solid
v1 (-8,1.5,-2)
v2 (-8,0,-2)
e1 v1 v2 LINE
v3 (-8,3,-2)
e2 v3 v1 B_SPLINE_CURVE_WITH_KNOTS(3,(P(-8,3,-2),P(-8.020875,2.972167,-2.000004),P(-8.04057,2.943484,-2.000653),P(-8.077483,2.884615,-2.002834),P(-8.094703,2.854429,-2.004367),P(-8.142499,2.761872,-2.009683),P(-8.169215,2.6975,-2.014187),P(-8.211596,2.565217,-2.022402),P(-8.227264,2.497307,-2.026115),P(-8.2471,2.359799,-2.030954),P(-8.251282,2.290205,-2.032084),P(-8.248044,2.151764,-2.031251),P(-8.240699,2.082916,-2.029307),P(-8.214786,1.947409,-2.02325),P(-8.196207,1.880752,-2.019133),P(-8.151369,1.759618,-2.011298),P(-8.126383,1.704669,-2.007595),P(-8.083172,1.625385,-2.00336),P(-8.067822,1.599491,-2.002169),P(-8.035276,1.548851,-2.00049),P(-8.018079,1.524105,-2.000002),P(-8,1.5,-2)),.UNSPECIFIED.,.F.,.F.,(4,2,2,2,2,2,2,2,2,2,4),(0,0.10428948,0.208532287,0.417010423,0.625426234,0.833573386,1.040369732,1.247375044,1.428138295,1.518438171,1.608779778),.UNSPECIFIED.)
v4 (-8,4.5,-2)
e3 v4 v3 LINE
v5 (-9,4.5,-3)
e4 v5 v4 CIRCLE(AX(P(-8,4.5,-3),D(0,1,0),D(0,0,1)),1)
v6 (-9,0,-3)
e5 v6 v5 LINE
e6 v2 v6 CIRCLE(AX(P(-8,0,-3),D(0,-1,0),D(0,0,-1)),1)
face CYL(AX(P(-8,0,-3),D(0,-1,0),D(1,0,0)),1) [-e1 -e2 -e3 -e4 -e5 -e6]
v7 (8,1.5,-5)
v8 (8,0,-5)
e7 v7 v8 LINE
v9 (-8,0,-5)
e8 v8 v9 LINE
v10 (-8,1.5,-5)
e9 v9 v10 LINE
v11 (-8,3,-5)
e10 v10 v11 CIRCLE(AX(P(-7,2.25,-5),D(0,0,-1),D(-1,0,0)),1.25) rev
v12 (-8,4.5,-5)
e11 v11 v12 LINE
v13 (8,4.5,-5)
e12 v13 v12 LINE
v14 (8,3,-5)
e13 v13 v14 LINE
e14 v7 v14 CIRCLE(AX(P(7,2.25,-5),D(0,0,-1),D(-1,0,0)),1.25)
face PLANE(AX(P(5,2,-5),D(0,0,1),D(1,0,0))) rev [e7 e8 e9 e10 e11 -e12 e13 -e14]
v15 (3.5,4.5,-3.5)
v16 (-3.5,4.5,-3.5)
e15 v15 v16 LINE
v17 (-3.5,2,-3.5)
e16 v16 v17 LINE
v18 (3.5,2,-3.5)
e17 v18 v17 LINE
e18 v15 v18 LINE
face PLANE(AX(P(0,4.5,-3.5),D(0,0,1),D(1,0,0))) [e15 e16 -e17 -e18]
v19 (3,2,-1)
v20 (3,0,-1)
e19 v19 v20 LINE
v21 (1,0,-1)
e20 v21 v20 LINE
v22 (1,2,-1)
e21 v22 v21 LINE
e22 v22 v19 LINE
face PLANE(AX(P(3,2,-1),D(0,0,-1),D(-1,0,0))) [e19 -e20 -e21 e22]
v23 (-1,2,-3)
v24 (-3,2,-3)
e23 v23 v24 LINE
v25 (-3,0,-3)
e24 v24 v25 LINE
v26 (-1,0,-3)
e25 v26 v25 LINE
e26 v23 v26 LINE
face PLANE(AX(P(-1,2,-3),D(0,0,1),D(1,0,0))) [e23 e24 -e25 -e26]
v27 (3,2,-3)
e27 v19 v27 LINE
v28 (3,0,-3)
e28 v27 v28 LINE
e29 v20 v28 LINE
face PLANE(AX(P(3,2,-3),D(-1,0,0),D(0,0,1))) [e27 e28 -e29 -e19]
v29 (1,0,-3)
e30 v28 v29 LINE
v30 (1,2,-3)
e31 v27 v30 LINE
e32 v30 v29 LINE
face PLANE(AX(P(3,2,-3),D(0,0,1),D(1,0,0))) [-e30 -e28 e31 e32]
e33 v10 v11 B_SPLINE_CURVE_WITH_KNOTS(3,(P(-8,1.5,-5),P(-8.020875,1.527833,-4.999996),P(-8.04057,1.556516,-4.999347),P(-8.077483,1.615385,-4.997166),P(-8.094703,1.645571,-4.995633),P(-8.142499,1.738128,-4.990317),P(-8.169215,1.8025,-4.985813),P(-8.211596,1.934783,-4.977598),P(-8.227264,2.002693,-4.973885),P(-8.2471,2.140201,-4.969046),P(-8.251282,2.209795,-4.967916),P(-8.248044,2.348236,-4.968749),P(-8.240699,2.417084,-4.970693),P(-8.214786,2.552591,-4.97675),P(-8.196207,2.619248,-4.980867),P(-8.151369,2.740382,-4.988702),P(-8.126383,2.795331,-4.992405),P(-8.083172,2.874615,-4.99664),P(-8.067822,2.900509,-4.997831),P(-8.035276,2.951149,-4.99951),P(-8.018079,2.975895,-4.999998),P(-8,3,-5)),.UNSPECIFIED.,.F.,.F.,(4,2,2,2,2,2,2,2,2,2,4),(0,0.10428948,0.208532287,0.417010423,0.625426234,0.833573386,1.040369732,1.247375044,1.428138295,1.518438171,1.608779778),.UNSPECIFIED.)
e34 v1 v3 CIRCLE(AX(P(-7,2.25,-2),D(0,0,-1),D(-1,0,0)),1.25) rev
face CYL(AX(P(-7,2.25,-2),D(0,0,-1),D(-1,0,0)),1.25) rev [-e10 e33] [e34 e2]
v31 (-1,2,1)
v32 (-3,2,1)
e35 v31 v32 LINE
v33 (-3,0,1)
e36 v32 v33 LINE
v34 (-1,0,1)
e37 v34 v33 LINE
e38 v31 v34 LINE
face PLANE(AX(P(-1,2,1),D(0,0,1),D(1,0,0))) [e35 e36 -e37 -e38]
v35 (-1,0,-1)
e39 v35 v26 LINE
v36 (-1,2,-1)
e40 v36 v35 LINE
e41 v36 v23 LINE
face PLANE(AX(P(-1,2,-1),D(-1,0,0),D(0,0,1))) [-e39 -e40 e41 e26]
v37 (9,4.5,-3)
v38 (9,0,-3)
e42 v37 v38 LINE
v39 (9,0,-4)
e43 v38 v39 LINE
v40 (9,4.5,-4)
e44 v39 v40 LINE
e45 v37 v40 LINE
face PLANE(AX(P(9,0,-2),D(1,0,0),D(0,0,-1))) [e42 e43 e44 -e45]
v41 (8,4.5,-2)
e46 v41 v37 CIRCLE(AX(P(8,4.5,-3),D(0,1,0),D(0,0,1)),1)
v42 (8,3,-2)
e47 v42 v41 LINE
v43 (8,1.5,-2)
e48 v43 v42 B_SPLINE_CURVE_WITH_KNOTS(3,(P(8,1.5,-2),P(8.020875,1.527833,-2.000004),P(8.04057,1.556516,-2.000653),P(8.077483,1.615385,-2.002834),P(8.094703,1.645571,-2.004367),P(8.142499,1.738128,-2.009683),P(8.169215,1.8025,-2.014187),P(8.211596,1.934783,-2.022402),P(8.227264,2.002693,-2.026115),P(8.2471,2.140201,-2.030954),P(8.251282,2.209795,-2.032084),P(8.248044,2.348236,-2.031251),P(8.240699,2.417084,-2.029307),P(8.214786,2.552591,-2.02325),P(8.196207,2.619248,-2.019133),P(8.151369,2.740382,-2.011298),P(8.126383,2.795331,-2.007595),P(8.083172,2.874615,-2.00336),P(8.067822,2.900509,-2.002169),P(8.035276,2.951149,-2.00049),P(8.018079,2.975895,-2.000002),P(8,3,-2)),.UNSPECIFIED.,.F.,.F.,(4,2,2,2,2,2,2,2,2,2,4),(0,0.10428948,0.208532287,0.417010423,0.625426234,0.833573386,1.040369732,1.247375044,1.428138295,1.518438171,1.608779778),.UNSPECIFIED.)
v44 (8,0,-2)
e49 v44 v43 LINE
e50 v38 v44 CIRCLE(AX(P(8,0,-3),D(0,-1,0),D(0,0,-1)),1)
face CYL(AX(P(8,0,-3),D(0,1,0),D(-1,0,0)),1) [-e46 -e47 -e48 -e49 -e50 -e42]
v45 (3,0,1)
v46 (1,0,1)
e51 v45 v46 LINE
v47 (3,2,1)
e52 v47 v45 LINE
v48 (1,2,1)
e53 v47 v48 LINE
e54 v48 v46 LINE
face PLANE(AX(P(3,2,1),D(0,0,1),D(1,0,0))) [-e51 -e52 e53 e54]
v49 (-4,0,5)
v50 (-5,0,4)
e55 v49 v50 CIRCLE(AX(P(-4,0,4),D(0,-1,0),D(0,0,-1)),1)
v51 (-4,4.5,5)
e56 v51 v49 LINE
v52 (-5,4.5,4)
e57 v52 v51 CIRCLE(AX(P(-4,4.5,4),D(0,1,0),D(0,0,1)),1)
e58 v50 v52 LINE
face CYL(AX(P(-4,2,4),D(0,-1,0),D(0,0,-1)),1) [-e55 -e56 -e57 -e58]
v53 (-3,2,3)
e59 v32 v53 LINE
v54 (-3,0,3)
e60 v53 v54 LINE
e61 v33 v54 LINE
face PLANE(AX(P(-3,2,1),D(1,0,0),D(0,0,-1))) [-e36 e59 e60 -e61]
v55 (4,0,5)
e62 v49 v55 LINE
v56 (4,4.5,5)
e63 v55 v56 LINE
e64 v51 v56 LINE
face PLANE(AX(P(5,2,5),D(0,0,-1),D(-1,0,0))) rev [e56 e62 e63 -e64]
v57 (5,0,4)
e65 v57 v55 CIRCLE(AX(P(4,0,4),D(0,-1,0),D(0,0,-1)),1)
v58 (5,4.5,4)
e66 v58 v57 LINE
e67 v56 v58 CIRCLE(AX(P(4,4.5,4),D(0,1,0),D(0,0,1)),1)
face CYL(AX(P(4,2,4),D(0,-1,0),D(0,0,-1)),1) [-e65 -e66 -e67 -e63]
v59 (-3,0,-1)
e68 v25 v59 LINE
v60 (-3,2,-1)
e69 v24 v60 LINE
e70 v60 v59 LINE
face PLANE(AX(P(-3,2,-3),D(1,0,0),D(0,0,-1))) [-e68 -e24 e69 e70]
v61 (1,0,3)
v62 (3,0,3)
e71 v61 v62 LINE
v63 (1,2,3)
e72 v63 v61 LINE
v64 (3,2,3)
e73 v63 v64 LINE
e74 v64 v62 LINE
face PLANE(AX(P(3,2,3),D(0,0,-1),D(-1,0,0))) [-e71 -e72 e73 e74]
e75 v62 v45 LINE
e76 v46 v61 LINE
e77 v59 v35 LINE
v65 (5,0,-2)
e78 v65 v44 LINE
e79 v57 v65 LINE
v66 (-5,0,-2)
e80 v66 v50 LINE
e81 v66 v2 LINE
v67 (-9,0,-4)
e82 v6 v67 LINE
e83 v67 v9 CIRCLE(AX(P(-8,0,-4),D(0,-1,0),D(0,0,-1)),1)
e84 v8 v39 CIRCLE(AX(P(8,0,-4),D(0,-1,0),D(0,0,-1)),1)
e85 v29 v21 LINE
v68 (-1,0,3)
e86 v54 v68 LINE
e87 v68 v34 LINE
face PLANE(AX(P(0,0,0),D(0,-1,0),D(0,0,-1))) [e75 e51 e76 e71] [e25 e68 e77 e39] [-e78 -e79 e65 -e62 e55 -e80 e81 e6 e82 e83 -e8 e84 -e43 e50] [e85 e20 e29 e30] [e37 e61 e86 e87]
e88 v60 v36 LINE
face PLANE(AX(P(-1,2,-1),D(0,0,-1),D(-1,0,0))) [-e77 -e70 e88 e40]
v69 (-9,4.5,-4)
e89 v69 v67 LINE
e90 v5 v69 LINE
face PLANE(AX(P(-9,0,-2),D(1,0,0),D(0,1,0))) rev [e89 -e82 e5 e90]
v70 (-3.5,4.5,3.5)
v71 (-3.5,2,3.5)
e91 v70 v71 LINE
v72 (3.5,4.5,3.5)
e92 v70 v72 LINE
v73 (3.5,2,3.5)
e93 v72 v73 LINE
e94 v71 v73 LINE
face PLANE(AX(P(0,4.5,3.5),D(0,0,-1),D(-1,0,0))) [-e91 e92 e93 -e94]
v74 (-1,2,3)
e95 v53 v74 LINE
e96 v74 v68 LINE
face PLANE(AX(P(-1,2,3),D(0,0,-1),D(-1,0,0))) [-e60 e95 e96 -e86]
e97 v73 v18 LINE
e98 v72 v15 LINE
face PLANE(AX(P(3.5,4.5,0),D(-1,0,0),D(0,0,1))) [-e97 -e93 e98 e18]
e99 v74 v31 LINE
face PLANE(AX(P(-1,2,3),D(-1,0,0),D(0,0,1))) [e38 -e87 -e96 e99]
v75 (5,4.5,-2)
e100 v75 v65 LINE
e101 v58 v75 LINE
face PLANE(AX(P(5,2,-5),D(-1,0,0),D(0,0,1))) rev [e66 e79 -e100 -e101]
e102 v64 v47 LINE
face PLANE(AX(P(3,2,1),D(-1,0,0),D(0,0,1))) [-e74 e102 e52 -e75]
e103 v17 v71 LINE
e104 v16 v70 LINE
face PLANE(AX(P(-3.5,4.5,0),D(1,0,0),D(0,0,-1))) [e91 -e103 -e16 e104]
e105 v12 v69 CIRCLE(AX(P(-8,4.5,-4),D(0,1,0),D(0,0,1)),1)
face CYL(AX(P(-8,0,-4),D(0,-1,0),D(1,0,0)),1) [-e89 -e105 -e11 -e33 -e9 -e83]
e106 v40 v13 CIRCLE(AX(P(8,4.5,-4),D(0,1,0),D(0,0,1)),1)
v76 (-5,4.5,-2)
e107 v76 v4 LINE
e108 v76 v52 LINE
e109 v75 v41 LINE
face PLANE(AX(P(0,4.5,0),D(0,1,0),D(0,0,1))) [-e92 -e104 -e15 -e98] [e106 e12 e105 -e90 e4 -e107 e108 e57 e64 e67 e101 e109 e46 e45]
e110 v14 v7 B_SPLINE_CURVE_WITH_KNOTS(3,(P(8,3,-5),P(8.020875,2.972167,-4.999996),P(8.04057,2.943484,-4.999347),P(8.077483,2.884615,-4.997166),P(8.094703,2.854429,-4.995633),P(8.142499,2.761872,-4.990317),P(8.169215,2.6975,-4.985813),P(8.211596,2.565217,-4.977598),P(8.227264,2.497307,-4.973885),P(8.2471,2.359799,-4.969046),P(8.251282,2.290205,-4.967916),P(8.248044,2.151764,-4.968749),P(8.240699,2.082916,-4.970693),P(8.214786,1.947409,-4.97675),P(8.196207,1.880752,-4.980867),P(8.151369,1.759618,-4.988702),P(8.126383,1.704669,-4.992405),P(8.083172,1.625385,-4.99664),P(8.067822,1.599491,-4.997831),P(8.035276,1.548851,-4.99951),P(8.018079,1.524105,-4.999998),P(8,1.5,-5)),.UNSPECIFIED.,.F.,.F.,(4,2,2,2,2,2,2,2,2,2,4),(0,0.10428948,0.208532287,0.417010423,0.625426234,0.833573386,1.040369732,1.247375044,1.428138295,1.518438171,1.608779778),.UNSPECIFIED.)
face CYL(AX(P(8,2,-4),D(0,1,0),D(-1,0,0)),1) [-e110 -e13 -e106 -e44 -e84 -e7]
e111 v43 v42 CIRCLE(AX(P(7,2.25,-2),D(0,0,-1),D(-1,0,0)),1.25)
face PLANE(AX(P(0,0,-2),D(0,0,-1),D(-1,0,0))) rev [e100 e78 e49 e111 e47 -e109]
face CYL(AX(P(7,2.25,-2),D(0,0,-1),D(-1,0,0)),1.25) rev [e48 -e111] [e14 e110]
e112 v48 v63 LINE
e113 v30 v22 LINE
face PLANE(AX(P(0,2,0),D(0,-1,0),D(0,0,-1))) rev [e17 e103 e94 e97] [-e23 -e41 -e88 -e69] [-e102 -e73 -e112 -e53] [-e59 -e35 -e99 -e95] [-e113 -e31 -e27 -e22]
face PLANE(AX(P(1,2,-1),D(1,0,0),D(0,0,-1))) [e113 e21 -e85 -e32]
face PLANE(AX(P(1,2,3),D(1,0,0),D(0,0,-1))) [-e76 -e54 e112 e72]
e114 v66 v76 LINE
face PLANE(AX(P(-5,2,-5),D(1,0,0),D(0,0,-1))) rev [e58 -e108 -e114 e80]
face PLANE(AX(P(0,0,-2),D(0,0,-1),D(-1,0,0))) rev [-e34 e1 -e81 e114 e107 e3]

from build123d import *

# Parameters (mm, degrees)
ESBO_O1_W                = 10
ESBO_O1_H                = 10
ESBO_O1_W_2              = 2
ESBO_O1_H_2              = 2
RESSALTO_EXTRUS_O1_DEPTH = 2
ESBO_O2_W                = 10
ESBO_O2_H                = 10
RESSALTO_EXTRUS_O2_DEPTH = 2.5
ESBO_O3_W                = 4
ESBO_O3_H                = 4.5
ESBO_O3_R                = 1.25
RESSALTO_EXTRUS_O3_DEPTH = 3
FILETE1_R                = 1


with BuildPart() as part:
    # Esboço1 → Ressalto-extrusão1 (new body)
    with BuildSketch(Plane(origin=(0, 0, 0), x_dir=(1, 0, 0), z_dir=(0, 1, 0))):
        Rectangle(ESBO_O1_W, ESBO_O1_H)
        with Locations((2, 2)):
            Rectangle(ESBO_O1_W_2, ESBO_O1_H_2, mode=Mode.SUBTRACT)
        with Locations((-2, 2)):
            Rectangle(ESBO_O1_W_2, ESBO_O1_H_2, mode=Mode.SUBTRACT)
        with Locations((2, -2)):
            Rectangle(ESBO_O1_W_2, ESBO_O1_H_2, mode=Mode.SUBTRACT)
        with Locations((-2, -2)):
            Rectangle(ESBO_O1_W_2, ESBO_O1_H_2, mode=Mode.SUBTRACT)
    extrude(amount=RESSALTO_EXTRUS_O1_DEPTH)

    # Esboço2 → Ressalto-extrusão2 (add)
    with BuildSketch(Plane(origin=(0, 2, 0), x_dir=(1, 0, 0), z_dir=(0, 1, 0))):
        Rectangle(ESBO_O2_W, ESBO_O2_H)
        Polygon((-1, -3.5), (3.5, -3.5), (3.5, 3.5), (1, 3.5), (-3.5, 3.5), (-3.5, 1), (-3.5, -3.5), align=None, mode=Mode.SUBTRACT)
    extrude(amount=RESSALTO_EXTRUS_O2_DEPTH)

    # Esboço3 → Ressalto-extrusão3 (add)
    # profile 1 of 2: a face of its own
    with BuildSketch(Plane(origin=(0, 0, -5), x_dir=(-1, 0, 0), z_dir=(0, 0, -1))):
        with Locations((-7, 2.25)):
            Rectangle(ESBO_O3_W, ESBO_O3_H)
        with Locations((-7, 2.25)):
            Circle(ESBO_O3_R, mode=Mode.SUBTRACT)
    # profile 2 of 2: a face of its own
    with BuildSketch(Plane(origin=(0, 0, -5), x_dir=(-1, 0, 0), z_dir=(0, 0, -1))):
        with Locations((7, 2.25)):
            Rectangle(ESBO_O3_W, ESBO_O3_H)
        with Locations((7, 2.25)):
            Circle(ESBO_O3_R, mode=Mode.SUBTRACT)
    extrude(amount=-RESSALTO_EXTRUS_O3_DEPTH)

    # Filete1
    # the kernel refuses this fillet: 1 mm, written as the material it takes off along each edge
    with BuildSketch(Plane(origin=(9, 7, -2), x_dir=(-1, 0, 0), z_dir=(0, -1, 0)), Plane(origin=(-9, 7, -5), x_dir=(1, 0, 0), z_dir=(0, -1, 0)), Plane(origin=(5, 7, 5), x_dir=(-1, 0, 0), z_dir=(0, -1, 0))) as filete1_piece_1:
        with BuildLine():
            CenterArc((FILETE1_R, FILETE1_R), FILETE1_R, 180, 90)
            Line((0, FILETE1_R), (0, 0))
            Line((0, 0), (FILETE1_R, 0))
        make_face()
    extrude(amount=9.5, mode=Mode.SUBTRACT)
    with BuildSketch(Plane(origin=(9, 7, -5), x_dir=(-1, 0, 0), z_dir=(0, -1, 0)), Plane(origin=(-9, 7, -2), x_dir=(1, 0, 0), z_dir=(0, -1, 0)), Plane(origin=(-5, -2.5, 5), x_dir=(0, 0, -1), z_dir=(0, 1, 0))) as filete1_piece_2:
        with BuildLine():
            CenterArc((FILETE1_R, -FILETE1_R), FILETE1_R, 90, 90)
            Line((0, -FILETE1_R), (0, 0))
            Line((0, 0), (FILETE1_R, 0))
        make_face()
    extrude(amount=9.5, mode=Mode.SUBTRACT)


solid = part.part
